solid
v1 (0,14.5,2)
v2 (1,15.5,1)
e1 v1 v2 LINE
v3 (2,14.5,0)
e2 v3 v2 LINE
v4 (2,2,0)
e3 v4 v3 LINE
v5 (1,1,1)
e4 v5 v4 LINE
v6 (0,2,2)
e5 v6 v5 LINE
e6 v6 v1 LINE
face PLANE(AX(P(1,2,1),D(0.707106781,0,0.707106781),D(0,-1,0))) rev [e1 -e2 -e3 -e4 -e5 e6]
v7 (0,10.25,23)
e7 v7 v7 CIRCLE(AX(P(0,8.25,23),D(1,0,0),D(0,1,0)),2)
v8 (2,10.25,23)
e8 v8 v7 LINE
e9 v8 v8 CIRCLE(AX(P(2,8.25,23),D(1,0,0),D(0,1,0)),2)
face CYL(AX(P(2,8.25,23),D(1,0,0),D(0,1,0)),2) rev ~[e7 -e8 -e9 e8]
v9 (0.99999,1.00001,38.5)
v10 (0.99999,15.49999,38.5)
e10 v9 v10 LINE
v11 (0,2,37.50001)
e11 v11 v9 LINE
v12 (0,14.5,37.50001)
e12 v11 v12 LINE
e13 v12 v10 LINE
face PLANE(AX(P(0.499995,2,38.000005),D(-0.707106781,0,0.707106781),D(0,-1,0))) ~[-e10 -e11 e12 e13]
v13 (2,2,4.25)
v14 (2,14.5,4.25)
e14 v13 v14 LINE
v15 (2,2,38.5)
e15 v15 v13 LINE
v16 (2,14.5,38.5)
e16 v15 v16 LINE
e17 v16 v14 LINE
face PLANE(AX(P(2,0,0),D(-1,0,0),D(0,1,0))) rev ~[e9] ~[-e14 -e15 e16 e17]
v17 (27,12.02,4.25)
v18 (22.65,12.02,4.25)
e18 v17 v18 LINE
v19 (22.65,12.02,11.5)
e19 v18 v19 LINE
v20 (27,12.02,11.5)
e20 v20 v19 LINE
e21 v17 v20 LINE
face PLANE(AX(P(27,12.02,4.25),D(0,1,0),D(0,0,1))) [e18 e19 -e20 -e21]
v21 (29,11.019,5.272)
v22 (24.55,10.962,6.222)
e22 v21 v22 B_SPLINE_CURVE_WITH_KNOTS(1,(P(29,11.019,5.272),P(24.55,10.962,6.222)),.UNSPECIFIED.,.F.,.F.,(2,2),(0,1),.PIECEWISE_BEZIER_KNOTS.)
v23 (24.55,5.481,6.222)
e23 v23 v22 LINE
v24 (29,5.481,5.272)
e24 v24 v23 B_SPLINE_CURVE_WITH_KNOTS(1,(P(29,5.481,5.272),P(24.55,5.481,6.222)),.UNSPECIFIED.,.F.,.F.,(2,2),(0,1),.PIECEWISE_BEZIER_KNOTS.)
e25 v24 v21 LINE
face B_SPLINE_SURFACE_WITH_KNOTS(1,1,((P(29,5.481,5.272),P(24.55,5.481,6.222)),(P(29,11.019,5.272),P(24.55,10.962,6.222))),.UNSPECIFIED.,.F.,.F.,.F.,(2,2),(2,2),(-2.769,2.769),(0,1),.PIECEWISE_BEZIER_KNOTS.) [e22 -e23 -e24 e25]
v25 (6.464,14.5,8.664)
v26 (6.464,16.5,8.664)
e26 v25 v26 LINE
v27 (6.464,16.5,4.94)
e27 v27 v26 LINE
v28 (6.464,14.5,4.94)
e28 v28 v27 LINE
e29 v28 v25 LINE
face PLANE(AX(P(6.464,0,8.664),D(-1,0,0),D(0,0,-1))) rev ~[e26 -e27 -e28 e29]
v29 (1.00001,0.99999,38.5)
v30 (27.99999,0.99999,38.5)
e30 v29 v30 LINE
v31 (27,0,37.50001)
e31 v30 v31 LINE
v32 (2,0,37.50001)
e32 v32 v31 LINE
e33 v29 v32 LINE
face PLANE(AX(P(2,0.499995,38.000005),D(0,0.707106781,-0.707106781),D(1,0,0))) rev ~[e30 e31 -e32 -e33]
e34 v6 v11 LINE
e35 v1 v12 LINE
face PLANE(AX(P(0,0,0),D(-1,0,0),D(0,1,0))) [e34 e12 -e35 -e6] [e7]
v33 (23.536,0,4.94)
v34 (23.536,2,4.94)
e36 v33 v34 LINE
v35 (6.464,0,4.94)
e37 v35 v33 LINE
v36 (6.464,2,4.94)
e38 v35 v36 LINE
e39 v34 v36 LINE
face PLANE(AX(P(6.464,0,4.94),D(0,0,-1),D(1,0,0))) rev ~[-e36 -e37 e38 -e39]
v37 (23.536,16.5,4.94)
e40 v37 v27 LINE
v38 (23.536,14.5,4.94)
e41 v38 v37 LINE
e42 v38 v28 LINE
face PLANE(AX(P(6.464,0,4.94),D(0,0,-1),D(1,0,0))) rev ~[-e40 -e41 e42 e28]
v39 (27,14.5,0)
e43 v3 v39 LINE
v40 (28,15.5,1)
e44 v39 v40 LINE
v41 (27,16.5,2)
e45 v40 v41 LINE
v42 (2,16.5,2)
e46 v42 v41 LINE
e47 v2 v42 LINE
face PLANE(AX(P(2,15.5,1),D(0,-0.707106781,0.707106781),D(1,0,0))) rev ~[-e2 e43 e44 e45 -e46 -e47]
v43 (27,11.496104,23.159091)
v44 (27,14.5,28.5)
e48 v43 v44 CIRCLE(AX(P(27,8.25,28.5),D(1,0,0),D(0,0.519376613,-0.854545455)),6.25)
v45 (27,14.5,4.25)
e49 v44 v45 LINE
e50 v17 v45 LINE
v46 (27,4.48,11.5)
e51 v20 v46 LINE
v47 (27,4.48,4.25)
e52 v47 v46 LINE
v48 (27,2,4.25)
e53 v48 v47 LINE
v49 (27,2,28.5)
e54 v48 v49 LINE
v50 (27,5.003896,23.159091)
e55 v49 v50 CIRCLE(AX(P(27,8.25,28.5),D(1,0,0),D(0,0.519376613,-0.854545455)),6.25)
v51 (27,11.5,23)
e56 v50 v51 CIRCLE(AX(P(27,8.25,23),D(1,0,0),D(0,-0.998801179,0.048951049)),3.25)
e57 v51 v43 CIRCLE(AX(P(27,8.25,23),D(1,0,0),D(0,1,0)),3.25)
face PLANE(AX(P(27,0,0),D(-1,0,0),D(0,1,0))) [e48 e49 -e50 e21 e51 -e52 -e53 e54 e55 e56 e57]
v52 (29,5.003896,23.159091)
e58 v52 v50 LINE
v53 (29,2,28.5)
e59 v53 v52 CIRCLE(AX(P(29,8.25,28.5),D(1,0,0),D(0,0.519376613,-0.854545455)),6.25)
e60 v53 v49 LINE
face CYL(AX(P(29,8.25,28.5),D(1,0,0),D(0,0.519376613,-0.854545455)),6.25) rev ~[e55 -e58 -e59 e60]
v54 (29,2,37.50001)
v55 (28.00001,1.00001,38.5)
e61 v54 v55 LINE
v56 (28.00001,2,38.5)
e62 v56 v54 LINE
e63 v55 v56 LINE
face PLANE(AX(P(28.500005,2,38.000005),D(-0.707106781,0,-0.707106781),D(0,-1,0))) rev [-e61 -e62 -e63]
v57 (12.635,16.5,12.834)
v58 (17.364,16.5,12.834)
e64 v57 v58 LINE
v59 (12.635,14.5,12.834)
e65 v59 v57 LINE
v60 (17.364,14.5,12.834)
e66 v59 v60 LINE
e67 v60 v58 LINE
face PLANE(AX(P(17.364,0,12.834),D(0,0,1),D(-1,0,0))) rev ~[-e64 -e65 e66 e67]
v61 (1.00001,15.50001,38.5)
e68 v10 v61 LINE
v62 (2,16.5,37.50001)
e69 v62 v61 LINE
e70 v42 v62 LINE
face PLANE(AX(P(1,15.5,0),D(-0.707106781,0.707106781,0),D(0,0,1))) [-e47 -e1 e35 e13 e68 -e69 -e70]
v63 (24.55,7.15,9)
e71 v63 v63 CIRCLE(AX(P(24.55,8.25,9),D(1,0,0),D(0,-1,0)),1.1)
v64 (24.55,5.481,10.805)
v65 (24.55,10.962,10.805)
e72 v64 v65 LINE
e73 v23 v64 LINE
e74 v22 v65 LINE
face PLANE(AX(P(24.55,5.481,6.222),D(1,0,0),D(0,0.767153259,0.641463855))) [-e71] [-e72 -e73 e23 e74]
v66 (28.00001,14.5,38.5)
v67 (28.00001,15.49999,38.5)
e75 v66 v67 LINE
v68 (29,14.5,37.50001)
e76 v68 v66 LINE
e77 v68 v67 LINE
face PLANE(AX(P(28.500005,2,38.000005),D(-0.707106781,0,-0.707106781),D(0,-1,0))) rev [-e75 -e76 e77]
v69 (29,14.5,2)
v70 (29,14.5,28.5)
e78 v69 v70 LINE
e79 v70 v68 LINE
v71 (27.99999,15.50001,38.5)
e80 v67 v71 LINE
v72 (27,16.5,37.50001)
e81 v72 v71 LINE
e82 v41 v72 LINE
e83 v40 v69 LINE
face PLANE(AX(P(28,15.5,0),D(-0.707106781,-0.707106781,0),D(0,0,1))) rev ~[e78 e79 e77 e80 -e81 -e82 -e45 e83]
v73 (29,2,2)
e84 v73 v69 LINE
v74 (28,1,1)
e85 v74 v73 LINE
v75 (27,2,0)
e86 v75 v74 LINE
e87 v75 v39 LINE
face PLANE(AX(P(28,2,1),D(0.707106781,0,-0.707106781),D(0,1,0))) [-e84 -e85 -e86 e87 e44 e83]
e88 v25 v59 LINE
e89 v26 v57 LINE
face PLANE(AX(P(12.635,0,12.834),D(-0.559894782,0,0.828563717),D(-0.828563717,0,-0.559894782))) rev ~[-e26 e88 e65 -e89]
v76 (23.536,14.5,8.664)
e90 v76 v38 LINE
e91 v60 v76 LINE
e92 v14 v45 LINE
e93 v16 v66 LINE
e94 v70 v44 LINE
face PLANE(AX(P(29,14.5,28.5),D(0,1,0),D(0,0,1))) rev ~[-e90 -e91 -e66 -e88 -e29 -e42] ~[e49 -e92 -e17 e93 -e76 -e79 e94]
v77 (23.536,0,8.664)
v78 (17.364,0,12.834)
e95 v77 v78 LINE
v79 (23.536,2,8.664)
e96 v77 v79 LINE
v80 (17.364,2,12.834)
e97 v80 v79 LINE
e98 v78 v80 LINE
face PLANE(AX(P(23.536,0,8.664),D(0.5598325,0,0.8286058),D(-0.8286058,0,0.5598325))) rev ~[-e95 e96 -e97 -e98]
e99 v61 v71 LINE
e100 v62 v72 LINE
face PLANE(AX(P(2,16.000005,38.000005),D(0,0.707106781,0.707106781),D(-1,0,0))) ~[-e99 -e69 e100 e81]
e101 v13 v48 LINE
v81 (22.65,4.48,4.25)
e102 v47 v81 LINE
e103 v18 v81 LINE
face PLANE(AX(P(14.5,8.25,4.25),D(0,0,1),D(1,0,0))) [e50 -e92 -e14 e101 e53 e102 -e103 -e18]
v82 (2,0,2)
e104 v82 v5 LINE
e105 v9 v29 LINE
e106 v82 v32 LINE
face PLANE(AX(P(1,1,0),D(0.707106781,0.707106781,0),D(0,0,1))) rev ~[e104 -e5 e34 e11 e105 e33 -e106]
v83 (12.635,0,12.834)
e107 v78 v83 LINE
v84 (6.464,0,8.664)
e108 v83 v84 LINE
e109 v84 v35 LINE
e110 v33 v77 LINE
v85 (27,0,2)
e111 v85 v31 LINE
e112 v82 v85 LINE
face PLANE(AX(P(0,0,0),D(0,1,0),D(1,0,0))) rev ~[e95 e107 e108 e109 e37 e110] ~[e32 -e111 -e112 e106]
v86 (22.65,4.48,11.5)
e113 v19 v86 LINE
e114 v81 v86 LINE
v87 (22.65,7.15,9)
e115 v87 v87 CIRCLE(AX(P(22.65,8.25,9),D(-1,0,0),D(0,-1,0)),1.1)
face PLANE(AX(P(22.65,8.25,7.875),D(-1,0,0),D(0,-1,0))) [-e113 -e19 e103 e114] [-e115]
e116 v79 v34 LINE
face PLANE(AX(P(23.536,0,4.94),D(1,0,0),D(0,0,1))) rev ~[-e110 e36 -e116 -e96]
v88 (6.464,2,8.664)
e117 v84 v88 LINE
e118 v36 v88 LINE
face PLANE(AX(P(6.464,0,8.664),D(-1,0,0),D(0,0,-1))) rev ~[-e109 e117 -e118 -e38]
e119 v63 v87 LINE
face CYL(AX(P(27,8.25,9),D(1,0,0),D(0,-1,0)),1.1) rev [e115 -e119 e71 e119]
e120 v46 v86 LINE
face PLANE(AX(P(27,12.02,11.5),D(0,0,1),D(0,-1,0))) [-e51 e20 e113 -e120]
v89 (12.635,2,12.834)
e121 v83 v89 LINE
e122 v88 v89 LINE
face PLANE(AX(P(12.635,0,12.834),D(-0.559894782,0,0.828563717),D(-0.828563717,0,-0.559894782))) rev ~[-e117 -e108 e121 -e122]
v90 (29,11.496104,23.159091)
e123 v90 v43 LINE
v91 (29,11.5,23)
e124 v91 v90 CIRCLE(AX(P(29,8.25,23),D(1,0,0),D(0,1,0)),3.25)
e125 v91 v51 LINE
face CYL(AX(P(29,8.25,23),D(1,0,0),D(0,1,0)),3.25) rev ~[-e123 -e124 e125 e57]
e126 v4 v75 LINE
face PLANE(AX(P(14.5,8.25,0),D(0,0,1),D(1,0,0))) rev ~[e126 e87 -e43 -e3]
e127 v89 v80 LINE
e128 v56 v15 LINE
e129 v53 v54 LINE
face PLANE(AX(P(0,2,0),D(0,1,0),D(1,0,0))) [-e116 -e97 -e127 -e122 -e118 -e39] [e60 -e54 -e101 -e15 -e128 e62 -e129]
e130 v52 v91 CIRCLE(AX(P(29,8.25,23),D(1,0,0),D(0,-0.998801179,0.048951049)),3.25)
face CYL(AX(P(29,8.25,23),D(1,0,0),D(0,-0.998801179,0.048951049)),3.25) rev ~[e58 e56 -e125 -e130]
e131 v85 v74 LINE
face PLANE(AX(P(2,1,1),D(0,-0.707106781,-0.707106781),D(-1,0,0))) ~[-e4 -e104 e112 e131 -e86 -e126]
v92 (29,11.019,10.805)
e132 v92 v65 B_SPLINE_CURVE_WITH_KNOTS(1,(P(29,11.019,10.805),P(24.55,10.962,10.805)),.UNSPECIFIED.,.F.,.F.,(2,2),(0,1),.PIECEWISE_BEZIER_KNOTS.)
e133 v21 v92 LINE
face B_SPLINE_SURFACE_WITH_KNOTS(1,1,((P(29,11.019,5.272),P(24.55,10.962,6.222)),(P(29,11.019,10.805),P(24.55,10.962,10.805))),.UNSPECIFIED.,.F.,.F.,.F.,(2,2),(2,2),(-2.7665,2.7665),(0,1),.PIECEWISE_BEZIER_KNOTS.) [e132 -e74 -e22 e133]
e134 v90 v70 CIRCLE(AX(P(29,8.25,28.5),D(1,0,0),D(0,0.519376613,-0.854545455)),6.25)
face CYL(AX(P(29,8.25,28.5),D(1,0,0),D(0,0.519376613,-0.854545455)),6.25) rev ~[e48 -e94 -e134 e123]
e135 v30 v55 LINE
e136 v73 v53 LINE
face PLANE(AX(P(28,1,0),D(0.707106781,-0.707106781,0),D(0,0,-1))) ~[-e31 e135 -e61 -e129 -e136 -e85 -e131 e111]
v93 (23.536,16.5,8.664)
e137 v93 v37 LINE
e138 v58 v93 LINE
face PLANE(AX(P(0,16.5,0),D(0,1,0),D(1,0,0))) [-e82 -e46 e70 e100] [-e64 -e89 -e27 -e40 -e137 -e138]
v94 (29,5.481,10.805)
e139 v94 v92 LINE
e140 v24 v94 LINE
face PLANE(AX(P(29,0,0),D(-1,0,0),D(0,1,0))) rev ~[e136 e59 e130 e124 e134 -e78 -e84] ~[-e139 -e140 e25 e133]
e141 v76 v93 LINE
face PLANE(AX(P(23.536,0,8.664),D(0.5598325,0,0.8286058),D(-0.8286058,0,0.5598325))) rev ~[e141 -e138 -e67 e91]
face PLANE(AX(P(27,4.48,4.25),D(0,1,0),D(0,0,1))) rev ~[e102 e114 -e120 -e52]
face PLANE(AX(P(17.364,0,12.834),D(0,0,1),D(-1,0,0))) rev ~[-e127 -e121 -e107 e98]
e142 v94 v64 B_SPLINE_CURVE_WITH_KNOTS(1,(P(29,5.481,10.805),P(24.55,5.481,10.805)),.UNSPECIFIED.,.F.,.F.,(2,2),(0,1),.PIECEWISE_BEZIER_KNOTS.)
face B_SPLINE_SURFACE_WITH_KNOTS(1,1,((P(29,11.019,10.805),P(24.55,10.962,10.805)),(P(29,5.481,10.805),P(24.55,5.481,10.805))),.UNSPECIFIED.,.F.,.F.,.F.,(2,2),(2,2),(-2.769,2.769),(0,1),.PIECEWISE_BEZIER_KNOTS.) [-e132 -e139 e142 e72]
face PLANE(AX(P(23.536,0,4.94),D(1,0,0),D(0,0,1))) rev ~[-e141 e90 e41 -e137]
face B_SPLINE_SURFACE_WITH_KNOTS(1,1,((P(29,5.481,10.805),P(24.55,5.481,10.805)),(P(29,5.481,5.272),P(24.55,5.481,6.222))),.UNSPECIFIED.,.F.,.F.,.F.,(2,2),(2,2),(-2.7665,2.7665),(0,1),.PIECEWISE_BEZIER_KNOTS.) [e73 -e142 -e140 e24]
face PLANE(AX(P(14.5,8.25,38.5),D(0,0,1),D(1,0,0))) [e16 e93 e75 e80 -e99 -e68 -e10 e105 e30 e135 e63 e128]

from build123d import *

# Parameters (mm, degrees)
F0_W      = 29
F0_H      = 16.5
F1_DEPTH  = 38.5
F2_T      = -2
F3_DEPTH  = 2.25
F4_SIZE   = 2
F5_SIZE   = 2
F6_SIZE   = 0.99999
F8_DEPTH  = 16.501
F9_W      = 12.5
F9_H      = 0.99999
F10_DEPTH = 2
F11_R     = 2
F12_DEPTH = 2.001
F13_W     = 7.54
F13_H     = 7.25
F13_R     = 1.1
F14_DEPTH = 4.35
F15_W     = 5.538
F15_H     = 5.533
F17_W     = 5.481
F17_H     = 4.583


# Not quite as in the source:
# - a fillet or chamfer is up to 0.001 mm smaller than in the source, because OpenCascade refuses the exact size


with BuildPart() as f1:
    # F0 (on Top) → F1 (new body)
    with BuildSketch(Plane.XY):
        with Locations((14.5, 8.25)):
            Rectangle(F0_W, F0_H)
    extrude(amount=F1_DEPTH)

    # F2
    f2_openings = [f1.faces().sort_by_distance(p)[0] for p in [
        (14.5, 8.25, 38.5),
    ]]
    offset(amount=F2_T, openings=f2_openings)

    # F3 (add): a face of the model
    f3_faces = [f1.faces().sort_by_distance(p)[0] for p in [
        (14.5, 8.25, 2),
    ]]
    extrude(f3_faces, amount=F3_DEPTH)

    # F4
    f4_edges = [f1.edges().sort_by_distance(p)[0] for p in [
        (0, 0, 19.25),
        (29, 0, 19.25),
        (29, 16.5, 19.25),
        (0, 16.5, 19.25),
    ]]
    chamfer(f4_edges, length=F4_SIZE)

    # F5 (call 1 of 4: OpenCascade refuses the feature's edges together)
    f5_edges = [f1.edges().sort_by_distance(p)[0] for p in [
        (14.5, 0, 0),
    ]]
    chamfer(f5_edges, length=F5_SIZE)

    # F5#2 (call 2 of 4)
    f5_2_edges = [f1.edges().sort_by_distance(p)[0] for p in [
        (0, 8.25, 0),
    ]]
    chamfer(f5_2_edges, length=F5_SIZE)

    # F5#3 (call 3 of 4)
    f5_3_edges = [f1.edges().sort_by_distance(p)[0] for p in [
        (14.5, 16.5, 0),
    ]]
    chamfer(f5_3_edges, length=F5_SIZE)

    # F5#4 (call 4 of 4)
    f5_4_edges = [f1.edges().sort_by_distance(p)[0] for p in [
        (29, 8.25, 0),
    ]]
    chamfer(f5_4_edges, length=F5_SIZE)

    # F6 (size 1 in the source; OpenCascade refuses exactly that, so slightly less here)
    f6_edges = [f1.edges().sort_by_distance(p)[0] for p in [
        (0, 8.25, 38.5),
        (14.5, 16.5, 38.5),
        (29, 8.25, 38.5),
        (14.5, 0, 38.5),
    ]]
    chamfer(f6_edges, length=F6_SIZE)

    # F7 (on face) → F8 (cut, through all)
    with BuildSketch(Plane.XZ):
        Polygon((6.464, 8.664), (6.464, 4.94), (23.536, 4.94), (23.536, 8.664), (17.364, 12.834), (12.635, 12.834), align=None)
    extrude(amount=-F8_DEPTH, mode=Mode.SUBTRACT)

    # F9 (on face) → F10 (cut, through all)
    with BuildSketch(Plane.YZ.offset(29)):
        with BuildLine():
            ThreePointArc((5.0038961688, 23.1590909091), (8.25, 22.25), (11.4961038312, 23.1590909091))
            ThreePointArc((11.4961038312, 23.1590909091), (8.25, 26.25), (5.0038961688, 23.1590909091))
        make_face()
        with BuildLine():
            ThreePointArc((5.0038961688, 23.1590909091), (8.1704306945, 19.7509741882), (11.5, 23))
            ThreePointArc((11.5, 23), (11.4990258118, 23.0795693055), (11.4961038312, 23.1590909091))
            ThreePointArc((11.4961038312, 23.1590909091), (8.25, 22.25), (5.0038961688, 23.1590909091))
        make_face()
        with BuildLine():
            ThreePointArc((5.0038961688, 23.1590909091), (8.25, 26.25), (11.4961038312, 23.1590909091))
            ThreePointArc((11.4961038312, 23.1590909091), (13.6975062618, 25.4361502113), (14.5, 28.5))
            Line((14.5, 28.5), (2, 28.5))
            ThreePointArc((2, 28.5), (2.8024937382, 25.4361502113), (5.0038961688, 23.1590909091))
        make_face()
        with BuildLine():
            Line((2, 28.5), (14.5, 28.5))
            ThreePointArc((14.5, 28.5), (8.25, 34.75), (2, 28.5))
        make_face()
        with BuildLine():
            ThreePointArc((2, 28.5), (8.25, 34.75), (14.5, 28.5))
            Line((14.5, 28.5), (14.5, 37.50001))
            Line((14.5, 37.50001), (2, 37.50001))
            Line((2, 37.50001), (2, 28.5))
        make_face()
        with Locations((8.25, 38.000005)):
            Rectangle(F9_W, F9_H)
    extrude(amount=-F10_DEPTH, mode=Mode.SUBTRACT)

    # F11 (on face) → F12 (cut, through all)
    with BuildSketch(Plane.YZ.offset(2)):
        with Locations((8.25, 23)):
            Circle(F11_R)
    extrude(amount=-F12_DEPTH, mode=Mode.SUBTRACT)

    # F13 (on face) → F14 (join)
    with BuildSketch(Plane(origin=(27, 0, 0), x_dir=(0, -1, 0), z_dir=(-1, 0, 0))):
        with Locations((-8.25, 7.875)):
            Rectangle(F13_W, F13_H)
        with Locations((-8.25, 9)):
            Circle(F13_R, mode=Mode.SUBTRACT)
    extrude(amount=F14_DEPTH)

    # F15 (on face) → F18 section 0
    with BuildSketch(Plane.YZ.offset(29)):
        with Locations((8.25, 8.0385)):
            Rectangle(F15_W, F15_H)
    # F17 (on offset) → F18 section 1
    with BuildSketch(Plane.YZ.offset(24.55)):
        with Locations((8.2215, 8.5135)):
            Rectangle(F17_W, F17_H)
    loft(mode=Mode.SUBTRACT)


solid = f1.part
